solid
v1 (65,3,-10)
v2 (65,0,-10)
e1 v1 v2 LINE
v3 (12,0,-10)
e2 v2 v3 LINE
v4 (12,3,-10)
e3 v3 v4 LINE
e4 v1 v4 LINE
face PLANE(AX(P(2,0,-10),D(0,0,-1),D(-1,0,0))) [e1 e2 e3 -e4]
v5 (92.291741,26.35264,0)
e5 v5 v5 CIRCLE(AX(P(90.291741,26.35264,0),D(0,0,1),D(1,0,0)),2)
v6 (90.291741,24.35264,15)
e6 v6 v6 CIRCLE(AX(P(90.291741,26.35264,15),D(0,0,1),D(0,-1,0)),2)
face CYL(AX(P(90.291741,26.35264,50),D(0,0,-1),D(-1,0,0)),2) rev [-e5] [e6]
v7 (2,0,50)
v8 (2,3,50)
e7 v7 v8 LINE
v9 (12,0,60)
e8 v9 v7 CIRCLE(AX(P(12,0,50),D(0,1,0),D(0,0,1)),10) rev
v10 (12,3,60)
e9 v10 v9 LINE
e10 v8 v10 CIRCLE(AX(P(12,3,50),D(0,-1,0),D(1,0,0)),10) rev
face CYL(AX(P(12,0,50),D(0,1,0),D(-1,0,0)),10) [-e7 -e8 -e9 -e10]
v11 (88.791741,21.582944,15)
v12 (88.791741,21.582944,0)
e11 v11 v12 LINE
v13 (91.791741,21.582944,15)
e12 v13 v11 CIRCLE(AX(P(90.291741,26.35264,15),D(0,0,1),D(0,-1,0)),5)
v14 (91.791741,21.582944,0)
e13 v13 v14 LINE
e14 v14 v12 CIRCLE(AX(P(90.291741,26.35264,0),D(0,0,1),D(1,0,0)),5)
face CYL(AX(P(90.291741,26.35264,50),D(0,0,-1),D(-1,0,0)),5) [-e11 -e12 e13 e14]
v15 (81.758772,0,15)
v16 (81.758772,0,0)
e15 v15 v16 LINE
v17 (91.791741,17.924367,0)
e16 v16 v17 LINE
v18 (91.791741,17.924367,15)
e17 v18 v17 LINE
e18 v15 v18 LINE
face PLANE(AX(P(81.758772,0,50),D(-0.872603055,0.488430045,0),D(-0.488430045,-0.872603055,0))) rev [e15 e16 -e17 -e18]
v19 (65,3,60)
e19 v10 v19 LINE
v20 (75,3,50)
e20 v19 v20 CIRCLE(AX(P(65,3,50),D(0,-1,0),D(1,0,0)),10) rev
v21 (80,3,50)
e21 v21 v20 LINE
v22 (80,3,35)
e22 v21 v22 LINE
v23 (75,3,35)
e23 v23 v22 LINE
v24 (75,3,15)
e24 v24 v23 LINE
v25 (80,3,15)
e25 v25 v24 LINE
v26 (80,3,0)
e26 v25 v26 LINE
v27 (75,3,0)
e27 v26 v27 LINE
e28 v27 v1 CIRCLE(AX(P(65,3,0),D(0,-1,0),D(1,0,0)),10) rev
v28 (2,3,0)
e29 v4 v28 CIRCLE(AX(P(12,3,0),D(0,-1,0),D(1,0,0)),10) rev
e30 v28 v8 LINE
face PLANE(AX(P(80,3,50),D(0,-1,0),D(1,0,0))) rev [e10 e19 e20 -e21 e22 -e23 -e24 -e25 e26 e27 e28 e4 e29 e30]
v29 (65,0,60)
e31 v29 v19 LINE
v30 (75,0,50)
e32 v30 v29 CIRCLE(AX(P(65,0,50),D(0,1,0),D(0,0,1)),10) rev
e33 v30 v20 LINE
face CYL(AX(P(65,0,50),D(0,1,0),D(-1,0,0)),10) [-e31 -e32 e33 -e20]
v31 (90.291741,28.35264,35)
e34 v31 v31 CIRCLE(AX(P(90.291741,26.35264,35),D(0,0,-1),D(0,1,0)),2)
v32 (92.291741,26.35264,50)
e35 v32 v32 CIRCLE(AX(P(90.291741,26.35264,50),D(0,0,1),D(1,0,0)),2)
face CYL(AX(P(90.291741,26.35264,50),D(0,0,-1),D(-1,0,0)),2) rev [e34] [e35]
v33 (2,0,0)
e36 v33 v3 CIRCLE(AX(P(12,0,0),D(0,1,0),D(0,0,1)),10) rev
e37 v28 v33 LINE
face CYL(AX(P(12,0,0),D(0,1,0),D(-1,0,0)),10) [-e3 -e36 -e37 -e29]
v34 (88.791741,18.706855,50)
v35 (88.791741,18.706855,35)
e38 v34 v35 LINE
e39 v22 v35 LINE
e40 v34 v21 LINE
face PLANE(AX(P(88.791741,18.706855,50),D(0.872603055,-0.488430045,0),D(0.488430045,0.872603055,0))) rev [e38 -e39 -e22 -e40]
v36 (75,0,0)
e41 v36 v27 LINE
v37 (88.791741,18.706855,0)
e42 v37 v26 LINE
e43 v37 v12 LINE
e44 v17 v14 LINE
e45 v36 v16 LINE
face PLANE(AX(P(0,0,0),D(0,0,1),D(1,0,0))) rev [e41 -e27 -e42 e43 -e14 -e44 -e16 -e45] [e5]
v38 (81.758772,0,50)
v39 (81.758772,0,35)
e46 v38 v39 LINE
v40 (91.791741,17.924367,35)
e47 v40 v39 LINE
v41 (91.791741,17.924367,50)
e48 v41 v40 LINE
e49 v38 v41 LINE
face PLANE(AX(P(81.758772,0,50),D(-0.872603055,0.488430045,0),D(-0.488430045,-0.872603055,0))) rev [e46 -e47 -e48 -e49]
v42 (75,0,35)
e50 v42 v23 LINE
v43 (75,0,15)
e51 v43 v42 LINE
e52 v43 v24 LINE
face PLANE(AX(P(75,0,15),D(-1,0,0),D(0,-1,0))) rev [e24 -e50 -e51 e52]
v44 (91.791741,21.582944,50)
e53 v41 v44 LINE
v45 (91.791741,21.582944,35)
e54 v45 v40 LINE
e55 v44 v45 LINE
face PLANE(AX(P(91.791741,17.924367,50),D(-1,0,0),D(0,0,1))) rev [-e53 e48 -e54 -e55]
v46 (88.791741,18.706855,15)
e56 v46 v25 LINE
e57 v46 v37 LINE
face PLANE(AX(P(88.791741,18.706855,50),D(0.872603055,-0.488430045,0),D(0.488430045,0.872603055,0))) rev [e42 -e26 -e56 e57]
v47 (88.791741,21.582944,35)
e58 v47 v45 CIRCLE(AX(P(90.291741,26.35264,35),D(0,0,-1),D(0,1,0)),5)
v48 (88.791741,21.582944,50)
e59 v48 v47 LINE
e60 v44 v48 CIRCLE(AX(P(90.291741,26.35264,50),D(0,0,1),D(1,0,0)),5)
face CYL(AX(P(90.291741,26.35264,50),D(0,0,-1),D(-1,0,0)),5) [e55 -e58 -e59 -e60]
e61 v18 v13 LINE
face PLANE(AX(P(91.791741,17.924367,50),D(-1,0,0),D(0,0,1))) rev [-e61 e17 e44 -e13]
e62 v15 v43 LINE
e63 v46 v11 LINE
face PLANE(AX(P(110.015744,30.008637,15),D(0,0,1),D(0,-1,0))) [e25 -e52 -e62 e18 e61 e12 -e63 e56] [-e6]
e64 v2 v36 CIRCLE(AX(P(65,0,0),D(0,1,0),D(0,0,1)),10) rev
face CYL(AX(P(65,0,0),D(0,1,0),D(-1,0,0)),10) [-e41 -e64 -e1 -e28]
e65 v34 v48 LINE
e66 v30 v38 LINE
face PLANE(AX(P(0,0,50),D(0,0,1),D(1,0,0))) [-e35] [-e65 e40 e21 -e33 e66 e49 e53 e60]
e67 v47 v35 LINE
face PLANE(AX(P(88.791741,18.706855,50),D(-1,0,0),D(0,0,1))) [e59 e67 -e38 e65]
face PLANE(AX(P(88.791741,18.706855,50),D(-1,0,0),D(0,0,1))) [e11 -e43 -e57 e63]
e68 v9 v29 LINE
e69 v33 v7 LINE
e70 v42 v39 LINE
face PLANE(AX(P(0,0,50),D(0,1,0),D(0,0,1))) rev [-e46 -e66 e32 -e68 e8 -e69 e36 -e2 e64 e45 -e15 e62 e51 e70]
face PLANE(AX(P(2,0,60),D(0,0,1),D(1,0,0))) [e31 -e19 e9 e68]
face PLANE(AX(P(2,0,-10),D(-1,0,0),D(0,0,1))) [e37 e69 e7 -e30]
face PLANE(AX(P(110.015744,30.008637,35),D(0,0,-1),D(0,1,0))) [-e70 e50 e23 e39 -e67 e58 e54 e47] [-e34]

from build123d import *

# Parameters (mm, degrees)
SKETCH1_R               = 5
BOSS_EXTRUDE1_DEPTH     = 50
SKETCH2_R               = 2
CUT_EXTRUDE1_DEPTH      = 113.087037288
CUT_EXTRUDE3_DEPTH      = 10
CUT_EXTRUDE3_DEPTH_BACK = 10
SKETCH7_W               = 20
SKETCH7_H               = 39.987182744
BOSS_EXTRUDE2_REACH     = 114.087
CUT_EXTRUDE4_REACH      = 114.087
SKETCH9_W               = 20
SKETCH9_H               = 10.896319728
CUT_EXTRUDE6_REACH      = 114.087
SKETCH11_W              = 5
SKETCH11_H              = 3
SKETCH12_W              = 73
SKETCH12_H              = 70
BOSS_EXTRUDE3_DEPTH     = 3
SKETCH13_W              = 6.758772051
SKETCH13_H              = 20
CUT_EXTRUDE7_DEPTH      = 117.122297969
FILLET1_R               = 10


with BuildPart() as part:
    # Sketch1 → Boss-Extrude1 (new body)
    with BuildSketch(Plane.XY):
        with Locations((90.291740814, 26.352640412)):
            Circle(SKETCH1_R)
        Polygon((0, 3), (0, 0), (81.758772051, 0), (91.791740814, 17.924366601), (91.791740814, 23.706854983), (88.791740814, 23.706854983), (88.791740814, 18.706854983), (80, 3), align=None)
    extrude(amount=BOSS_EXTRUDE1_DEPTH)

    # Sketch2 → Cut-Extrude1 (cut, through all)
    with BuildSketch(Plane.XY):
        with Locations((90.291740814, 26.352640412)):
            Circle(SKETCH2_R)
    extrude(amount=CUT_EXTRUDE1_DEPTH, mode=Mode.SUBTRACT)

    # Sketch7 → Cut-Extrude3 (cut, two sides: drawn at the far end of the back side and taken through both)
    with BuildSketch(Plane(origin=(62.254079791, -34.846042362, 0), x_dir=(0, 0, -1), z_dir=(0.8726030546274219, -0.4884300452008377, 0)).offset(-CUT_EXTRUDE3_DEPTH_BACK)):
        with Locations((-25, 59.927032101)):
            Rectangle(SKETCH7_W, SKETCH7_H)
    extrude(amount=CUT_EXTRUDE3_DEPTH + CUT_EXTRUDE3_DEPTH_BACK, mode=Mode.SUBTRACT)

    # Sketch8 → Boss-Extrude2 (add, up to next)
    with BuildSketch(Plane.XY, mode=Mode.PRIVATE) as boss_extrude2_sk1:
        Polygon((66.951015515, 3), (66.951015515, 0), (81.758772051, 0), (79.25400484, 1.667244856), (80, 3), align=None)
    boss_extrude2_tool1 = extrude(boss_extrude2_sk1.sketch, amount=BOSS_EXTRUDE2_REACH, mode=Mode.PRIVATE) - part.part
    add(boss_extrude2_tool1.solids().sort_by_distance((73.552437, 1.463367, 0))[0])

    # Sketch9 → Cut-Extrude4 (cut, up to next)
    with BuildSketch(Plane(origin=(0, 0, 0), x_dir=(0, 0, -1), z_dir=(1, 0, 0)), mode=Mode.PRIVATE) as cut_extrude4_sk1:
        with Locations((-25, 32.01270193)):
            Rectangle(SKETCH9_W, SKETCH9_H)
    cut_extrude4_tool1 = extrude(cut_extrude4_sk1.sketch, amount=CUT_EXTRUDE4_REACH, mode=Mode.PRIVATE) & part.part
    add(cut_extrude4_tool1.solids().sort_by_distance((0, 32.012702, 25))[0], mode=Mode.SUBTRACT)

    # Sketch11 → Cut-Extrude6 (cut, up to next)
    with BuildSketch(Plane.XY.offset(50), mode=Mode.PRIVATE) as cut_extrude6_sk1:
        with Locations((2.5, 1.5)):
            Rectangle(SKETCH11_W, SKETCH11_H)
    cut_extrude6_tool1 = extrude(cut_extrude6_sk1.sketch, amount=-CUT_EXTRUDE6_REACH, mode=Mode.PRIVATE) & part.part
    add(cut_extrude6_tool1.solids().sort_by_distance((2.5, 1.5, 50))[0], mode=Mode.SUBTRACT)

    # Sketch12 → Boss-Extrude3 (add, through all)
    with BuildSketch(Plane(origin=(0, 3, 0), x_dir=(1, 0, 0), z_dir=(0, 1, 0))):
        with Locations((38.5, -25)):
            Rectangle(SKETCH12_W, SKETCH12_H)
    extrude(amount=-BOSS_EXTRUDE3_DEPTH)

    # Sketch13 → Cut-Extrude7 (cut, through all)
    with BuildSketch(Plane(origin=(0, 3, 0), x_dir=(1, 0, 0), z_dir=(0, 1, 0))):
        with Locations((78.379386025, -25)):
            Rectangle(SKETCH13_W, SKETCH13_H)
    extrude(amount=-CUT_EXTRUDE7_DEPTH, mode=Mode.SUBTRACT)

    # Fillet1
    fillet1_edges = [part.edges().sort_by_distance(p)[0] for p in [
        (75, 1.5, -10),
        (2, 1.5, -10),
        (2, 1.5, 60),
        (75, 1.5, 60),
    ]]
    fillet(fillet1_edges, radius=FILLET1_R - 0.0001)  # a hair under: the kernel refuses the full size


solid = part.part
